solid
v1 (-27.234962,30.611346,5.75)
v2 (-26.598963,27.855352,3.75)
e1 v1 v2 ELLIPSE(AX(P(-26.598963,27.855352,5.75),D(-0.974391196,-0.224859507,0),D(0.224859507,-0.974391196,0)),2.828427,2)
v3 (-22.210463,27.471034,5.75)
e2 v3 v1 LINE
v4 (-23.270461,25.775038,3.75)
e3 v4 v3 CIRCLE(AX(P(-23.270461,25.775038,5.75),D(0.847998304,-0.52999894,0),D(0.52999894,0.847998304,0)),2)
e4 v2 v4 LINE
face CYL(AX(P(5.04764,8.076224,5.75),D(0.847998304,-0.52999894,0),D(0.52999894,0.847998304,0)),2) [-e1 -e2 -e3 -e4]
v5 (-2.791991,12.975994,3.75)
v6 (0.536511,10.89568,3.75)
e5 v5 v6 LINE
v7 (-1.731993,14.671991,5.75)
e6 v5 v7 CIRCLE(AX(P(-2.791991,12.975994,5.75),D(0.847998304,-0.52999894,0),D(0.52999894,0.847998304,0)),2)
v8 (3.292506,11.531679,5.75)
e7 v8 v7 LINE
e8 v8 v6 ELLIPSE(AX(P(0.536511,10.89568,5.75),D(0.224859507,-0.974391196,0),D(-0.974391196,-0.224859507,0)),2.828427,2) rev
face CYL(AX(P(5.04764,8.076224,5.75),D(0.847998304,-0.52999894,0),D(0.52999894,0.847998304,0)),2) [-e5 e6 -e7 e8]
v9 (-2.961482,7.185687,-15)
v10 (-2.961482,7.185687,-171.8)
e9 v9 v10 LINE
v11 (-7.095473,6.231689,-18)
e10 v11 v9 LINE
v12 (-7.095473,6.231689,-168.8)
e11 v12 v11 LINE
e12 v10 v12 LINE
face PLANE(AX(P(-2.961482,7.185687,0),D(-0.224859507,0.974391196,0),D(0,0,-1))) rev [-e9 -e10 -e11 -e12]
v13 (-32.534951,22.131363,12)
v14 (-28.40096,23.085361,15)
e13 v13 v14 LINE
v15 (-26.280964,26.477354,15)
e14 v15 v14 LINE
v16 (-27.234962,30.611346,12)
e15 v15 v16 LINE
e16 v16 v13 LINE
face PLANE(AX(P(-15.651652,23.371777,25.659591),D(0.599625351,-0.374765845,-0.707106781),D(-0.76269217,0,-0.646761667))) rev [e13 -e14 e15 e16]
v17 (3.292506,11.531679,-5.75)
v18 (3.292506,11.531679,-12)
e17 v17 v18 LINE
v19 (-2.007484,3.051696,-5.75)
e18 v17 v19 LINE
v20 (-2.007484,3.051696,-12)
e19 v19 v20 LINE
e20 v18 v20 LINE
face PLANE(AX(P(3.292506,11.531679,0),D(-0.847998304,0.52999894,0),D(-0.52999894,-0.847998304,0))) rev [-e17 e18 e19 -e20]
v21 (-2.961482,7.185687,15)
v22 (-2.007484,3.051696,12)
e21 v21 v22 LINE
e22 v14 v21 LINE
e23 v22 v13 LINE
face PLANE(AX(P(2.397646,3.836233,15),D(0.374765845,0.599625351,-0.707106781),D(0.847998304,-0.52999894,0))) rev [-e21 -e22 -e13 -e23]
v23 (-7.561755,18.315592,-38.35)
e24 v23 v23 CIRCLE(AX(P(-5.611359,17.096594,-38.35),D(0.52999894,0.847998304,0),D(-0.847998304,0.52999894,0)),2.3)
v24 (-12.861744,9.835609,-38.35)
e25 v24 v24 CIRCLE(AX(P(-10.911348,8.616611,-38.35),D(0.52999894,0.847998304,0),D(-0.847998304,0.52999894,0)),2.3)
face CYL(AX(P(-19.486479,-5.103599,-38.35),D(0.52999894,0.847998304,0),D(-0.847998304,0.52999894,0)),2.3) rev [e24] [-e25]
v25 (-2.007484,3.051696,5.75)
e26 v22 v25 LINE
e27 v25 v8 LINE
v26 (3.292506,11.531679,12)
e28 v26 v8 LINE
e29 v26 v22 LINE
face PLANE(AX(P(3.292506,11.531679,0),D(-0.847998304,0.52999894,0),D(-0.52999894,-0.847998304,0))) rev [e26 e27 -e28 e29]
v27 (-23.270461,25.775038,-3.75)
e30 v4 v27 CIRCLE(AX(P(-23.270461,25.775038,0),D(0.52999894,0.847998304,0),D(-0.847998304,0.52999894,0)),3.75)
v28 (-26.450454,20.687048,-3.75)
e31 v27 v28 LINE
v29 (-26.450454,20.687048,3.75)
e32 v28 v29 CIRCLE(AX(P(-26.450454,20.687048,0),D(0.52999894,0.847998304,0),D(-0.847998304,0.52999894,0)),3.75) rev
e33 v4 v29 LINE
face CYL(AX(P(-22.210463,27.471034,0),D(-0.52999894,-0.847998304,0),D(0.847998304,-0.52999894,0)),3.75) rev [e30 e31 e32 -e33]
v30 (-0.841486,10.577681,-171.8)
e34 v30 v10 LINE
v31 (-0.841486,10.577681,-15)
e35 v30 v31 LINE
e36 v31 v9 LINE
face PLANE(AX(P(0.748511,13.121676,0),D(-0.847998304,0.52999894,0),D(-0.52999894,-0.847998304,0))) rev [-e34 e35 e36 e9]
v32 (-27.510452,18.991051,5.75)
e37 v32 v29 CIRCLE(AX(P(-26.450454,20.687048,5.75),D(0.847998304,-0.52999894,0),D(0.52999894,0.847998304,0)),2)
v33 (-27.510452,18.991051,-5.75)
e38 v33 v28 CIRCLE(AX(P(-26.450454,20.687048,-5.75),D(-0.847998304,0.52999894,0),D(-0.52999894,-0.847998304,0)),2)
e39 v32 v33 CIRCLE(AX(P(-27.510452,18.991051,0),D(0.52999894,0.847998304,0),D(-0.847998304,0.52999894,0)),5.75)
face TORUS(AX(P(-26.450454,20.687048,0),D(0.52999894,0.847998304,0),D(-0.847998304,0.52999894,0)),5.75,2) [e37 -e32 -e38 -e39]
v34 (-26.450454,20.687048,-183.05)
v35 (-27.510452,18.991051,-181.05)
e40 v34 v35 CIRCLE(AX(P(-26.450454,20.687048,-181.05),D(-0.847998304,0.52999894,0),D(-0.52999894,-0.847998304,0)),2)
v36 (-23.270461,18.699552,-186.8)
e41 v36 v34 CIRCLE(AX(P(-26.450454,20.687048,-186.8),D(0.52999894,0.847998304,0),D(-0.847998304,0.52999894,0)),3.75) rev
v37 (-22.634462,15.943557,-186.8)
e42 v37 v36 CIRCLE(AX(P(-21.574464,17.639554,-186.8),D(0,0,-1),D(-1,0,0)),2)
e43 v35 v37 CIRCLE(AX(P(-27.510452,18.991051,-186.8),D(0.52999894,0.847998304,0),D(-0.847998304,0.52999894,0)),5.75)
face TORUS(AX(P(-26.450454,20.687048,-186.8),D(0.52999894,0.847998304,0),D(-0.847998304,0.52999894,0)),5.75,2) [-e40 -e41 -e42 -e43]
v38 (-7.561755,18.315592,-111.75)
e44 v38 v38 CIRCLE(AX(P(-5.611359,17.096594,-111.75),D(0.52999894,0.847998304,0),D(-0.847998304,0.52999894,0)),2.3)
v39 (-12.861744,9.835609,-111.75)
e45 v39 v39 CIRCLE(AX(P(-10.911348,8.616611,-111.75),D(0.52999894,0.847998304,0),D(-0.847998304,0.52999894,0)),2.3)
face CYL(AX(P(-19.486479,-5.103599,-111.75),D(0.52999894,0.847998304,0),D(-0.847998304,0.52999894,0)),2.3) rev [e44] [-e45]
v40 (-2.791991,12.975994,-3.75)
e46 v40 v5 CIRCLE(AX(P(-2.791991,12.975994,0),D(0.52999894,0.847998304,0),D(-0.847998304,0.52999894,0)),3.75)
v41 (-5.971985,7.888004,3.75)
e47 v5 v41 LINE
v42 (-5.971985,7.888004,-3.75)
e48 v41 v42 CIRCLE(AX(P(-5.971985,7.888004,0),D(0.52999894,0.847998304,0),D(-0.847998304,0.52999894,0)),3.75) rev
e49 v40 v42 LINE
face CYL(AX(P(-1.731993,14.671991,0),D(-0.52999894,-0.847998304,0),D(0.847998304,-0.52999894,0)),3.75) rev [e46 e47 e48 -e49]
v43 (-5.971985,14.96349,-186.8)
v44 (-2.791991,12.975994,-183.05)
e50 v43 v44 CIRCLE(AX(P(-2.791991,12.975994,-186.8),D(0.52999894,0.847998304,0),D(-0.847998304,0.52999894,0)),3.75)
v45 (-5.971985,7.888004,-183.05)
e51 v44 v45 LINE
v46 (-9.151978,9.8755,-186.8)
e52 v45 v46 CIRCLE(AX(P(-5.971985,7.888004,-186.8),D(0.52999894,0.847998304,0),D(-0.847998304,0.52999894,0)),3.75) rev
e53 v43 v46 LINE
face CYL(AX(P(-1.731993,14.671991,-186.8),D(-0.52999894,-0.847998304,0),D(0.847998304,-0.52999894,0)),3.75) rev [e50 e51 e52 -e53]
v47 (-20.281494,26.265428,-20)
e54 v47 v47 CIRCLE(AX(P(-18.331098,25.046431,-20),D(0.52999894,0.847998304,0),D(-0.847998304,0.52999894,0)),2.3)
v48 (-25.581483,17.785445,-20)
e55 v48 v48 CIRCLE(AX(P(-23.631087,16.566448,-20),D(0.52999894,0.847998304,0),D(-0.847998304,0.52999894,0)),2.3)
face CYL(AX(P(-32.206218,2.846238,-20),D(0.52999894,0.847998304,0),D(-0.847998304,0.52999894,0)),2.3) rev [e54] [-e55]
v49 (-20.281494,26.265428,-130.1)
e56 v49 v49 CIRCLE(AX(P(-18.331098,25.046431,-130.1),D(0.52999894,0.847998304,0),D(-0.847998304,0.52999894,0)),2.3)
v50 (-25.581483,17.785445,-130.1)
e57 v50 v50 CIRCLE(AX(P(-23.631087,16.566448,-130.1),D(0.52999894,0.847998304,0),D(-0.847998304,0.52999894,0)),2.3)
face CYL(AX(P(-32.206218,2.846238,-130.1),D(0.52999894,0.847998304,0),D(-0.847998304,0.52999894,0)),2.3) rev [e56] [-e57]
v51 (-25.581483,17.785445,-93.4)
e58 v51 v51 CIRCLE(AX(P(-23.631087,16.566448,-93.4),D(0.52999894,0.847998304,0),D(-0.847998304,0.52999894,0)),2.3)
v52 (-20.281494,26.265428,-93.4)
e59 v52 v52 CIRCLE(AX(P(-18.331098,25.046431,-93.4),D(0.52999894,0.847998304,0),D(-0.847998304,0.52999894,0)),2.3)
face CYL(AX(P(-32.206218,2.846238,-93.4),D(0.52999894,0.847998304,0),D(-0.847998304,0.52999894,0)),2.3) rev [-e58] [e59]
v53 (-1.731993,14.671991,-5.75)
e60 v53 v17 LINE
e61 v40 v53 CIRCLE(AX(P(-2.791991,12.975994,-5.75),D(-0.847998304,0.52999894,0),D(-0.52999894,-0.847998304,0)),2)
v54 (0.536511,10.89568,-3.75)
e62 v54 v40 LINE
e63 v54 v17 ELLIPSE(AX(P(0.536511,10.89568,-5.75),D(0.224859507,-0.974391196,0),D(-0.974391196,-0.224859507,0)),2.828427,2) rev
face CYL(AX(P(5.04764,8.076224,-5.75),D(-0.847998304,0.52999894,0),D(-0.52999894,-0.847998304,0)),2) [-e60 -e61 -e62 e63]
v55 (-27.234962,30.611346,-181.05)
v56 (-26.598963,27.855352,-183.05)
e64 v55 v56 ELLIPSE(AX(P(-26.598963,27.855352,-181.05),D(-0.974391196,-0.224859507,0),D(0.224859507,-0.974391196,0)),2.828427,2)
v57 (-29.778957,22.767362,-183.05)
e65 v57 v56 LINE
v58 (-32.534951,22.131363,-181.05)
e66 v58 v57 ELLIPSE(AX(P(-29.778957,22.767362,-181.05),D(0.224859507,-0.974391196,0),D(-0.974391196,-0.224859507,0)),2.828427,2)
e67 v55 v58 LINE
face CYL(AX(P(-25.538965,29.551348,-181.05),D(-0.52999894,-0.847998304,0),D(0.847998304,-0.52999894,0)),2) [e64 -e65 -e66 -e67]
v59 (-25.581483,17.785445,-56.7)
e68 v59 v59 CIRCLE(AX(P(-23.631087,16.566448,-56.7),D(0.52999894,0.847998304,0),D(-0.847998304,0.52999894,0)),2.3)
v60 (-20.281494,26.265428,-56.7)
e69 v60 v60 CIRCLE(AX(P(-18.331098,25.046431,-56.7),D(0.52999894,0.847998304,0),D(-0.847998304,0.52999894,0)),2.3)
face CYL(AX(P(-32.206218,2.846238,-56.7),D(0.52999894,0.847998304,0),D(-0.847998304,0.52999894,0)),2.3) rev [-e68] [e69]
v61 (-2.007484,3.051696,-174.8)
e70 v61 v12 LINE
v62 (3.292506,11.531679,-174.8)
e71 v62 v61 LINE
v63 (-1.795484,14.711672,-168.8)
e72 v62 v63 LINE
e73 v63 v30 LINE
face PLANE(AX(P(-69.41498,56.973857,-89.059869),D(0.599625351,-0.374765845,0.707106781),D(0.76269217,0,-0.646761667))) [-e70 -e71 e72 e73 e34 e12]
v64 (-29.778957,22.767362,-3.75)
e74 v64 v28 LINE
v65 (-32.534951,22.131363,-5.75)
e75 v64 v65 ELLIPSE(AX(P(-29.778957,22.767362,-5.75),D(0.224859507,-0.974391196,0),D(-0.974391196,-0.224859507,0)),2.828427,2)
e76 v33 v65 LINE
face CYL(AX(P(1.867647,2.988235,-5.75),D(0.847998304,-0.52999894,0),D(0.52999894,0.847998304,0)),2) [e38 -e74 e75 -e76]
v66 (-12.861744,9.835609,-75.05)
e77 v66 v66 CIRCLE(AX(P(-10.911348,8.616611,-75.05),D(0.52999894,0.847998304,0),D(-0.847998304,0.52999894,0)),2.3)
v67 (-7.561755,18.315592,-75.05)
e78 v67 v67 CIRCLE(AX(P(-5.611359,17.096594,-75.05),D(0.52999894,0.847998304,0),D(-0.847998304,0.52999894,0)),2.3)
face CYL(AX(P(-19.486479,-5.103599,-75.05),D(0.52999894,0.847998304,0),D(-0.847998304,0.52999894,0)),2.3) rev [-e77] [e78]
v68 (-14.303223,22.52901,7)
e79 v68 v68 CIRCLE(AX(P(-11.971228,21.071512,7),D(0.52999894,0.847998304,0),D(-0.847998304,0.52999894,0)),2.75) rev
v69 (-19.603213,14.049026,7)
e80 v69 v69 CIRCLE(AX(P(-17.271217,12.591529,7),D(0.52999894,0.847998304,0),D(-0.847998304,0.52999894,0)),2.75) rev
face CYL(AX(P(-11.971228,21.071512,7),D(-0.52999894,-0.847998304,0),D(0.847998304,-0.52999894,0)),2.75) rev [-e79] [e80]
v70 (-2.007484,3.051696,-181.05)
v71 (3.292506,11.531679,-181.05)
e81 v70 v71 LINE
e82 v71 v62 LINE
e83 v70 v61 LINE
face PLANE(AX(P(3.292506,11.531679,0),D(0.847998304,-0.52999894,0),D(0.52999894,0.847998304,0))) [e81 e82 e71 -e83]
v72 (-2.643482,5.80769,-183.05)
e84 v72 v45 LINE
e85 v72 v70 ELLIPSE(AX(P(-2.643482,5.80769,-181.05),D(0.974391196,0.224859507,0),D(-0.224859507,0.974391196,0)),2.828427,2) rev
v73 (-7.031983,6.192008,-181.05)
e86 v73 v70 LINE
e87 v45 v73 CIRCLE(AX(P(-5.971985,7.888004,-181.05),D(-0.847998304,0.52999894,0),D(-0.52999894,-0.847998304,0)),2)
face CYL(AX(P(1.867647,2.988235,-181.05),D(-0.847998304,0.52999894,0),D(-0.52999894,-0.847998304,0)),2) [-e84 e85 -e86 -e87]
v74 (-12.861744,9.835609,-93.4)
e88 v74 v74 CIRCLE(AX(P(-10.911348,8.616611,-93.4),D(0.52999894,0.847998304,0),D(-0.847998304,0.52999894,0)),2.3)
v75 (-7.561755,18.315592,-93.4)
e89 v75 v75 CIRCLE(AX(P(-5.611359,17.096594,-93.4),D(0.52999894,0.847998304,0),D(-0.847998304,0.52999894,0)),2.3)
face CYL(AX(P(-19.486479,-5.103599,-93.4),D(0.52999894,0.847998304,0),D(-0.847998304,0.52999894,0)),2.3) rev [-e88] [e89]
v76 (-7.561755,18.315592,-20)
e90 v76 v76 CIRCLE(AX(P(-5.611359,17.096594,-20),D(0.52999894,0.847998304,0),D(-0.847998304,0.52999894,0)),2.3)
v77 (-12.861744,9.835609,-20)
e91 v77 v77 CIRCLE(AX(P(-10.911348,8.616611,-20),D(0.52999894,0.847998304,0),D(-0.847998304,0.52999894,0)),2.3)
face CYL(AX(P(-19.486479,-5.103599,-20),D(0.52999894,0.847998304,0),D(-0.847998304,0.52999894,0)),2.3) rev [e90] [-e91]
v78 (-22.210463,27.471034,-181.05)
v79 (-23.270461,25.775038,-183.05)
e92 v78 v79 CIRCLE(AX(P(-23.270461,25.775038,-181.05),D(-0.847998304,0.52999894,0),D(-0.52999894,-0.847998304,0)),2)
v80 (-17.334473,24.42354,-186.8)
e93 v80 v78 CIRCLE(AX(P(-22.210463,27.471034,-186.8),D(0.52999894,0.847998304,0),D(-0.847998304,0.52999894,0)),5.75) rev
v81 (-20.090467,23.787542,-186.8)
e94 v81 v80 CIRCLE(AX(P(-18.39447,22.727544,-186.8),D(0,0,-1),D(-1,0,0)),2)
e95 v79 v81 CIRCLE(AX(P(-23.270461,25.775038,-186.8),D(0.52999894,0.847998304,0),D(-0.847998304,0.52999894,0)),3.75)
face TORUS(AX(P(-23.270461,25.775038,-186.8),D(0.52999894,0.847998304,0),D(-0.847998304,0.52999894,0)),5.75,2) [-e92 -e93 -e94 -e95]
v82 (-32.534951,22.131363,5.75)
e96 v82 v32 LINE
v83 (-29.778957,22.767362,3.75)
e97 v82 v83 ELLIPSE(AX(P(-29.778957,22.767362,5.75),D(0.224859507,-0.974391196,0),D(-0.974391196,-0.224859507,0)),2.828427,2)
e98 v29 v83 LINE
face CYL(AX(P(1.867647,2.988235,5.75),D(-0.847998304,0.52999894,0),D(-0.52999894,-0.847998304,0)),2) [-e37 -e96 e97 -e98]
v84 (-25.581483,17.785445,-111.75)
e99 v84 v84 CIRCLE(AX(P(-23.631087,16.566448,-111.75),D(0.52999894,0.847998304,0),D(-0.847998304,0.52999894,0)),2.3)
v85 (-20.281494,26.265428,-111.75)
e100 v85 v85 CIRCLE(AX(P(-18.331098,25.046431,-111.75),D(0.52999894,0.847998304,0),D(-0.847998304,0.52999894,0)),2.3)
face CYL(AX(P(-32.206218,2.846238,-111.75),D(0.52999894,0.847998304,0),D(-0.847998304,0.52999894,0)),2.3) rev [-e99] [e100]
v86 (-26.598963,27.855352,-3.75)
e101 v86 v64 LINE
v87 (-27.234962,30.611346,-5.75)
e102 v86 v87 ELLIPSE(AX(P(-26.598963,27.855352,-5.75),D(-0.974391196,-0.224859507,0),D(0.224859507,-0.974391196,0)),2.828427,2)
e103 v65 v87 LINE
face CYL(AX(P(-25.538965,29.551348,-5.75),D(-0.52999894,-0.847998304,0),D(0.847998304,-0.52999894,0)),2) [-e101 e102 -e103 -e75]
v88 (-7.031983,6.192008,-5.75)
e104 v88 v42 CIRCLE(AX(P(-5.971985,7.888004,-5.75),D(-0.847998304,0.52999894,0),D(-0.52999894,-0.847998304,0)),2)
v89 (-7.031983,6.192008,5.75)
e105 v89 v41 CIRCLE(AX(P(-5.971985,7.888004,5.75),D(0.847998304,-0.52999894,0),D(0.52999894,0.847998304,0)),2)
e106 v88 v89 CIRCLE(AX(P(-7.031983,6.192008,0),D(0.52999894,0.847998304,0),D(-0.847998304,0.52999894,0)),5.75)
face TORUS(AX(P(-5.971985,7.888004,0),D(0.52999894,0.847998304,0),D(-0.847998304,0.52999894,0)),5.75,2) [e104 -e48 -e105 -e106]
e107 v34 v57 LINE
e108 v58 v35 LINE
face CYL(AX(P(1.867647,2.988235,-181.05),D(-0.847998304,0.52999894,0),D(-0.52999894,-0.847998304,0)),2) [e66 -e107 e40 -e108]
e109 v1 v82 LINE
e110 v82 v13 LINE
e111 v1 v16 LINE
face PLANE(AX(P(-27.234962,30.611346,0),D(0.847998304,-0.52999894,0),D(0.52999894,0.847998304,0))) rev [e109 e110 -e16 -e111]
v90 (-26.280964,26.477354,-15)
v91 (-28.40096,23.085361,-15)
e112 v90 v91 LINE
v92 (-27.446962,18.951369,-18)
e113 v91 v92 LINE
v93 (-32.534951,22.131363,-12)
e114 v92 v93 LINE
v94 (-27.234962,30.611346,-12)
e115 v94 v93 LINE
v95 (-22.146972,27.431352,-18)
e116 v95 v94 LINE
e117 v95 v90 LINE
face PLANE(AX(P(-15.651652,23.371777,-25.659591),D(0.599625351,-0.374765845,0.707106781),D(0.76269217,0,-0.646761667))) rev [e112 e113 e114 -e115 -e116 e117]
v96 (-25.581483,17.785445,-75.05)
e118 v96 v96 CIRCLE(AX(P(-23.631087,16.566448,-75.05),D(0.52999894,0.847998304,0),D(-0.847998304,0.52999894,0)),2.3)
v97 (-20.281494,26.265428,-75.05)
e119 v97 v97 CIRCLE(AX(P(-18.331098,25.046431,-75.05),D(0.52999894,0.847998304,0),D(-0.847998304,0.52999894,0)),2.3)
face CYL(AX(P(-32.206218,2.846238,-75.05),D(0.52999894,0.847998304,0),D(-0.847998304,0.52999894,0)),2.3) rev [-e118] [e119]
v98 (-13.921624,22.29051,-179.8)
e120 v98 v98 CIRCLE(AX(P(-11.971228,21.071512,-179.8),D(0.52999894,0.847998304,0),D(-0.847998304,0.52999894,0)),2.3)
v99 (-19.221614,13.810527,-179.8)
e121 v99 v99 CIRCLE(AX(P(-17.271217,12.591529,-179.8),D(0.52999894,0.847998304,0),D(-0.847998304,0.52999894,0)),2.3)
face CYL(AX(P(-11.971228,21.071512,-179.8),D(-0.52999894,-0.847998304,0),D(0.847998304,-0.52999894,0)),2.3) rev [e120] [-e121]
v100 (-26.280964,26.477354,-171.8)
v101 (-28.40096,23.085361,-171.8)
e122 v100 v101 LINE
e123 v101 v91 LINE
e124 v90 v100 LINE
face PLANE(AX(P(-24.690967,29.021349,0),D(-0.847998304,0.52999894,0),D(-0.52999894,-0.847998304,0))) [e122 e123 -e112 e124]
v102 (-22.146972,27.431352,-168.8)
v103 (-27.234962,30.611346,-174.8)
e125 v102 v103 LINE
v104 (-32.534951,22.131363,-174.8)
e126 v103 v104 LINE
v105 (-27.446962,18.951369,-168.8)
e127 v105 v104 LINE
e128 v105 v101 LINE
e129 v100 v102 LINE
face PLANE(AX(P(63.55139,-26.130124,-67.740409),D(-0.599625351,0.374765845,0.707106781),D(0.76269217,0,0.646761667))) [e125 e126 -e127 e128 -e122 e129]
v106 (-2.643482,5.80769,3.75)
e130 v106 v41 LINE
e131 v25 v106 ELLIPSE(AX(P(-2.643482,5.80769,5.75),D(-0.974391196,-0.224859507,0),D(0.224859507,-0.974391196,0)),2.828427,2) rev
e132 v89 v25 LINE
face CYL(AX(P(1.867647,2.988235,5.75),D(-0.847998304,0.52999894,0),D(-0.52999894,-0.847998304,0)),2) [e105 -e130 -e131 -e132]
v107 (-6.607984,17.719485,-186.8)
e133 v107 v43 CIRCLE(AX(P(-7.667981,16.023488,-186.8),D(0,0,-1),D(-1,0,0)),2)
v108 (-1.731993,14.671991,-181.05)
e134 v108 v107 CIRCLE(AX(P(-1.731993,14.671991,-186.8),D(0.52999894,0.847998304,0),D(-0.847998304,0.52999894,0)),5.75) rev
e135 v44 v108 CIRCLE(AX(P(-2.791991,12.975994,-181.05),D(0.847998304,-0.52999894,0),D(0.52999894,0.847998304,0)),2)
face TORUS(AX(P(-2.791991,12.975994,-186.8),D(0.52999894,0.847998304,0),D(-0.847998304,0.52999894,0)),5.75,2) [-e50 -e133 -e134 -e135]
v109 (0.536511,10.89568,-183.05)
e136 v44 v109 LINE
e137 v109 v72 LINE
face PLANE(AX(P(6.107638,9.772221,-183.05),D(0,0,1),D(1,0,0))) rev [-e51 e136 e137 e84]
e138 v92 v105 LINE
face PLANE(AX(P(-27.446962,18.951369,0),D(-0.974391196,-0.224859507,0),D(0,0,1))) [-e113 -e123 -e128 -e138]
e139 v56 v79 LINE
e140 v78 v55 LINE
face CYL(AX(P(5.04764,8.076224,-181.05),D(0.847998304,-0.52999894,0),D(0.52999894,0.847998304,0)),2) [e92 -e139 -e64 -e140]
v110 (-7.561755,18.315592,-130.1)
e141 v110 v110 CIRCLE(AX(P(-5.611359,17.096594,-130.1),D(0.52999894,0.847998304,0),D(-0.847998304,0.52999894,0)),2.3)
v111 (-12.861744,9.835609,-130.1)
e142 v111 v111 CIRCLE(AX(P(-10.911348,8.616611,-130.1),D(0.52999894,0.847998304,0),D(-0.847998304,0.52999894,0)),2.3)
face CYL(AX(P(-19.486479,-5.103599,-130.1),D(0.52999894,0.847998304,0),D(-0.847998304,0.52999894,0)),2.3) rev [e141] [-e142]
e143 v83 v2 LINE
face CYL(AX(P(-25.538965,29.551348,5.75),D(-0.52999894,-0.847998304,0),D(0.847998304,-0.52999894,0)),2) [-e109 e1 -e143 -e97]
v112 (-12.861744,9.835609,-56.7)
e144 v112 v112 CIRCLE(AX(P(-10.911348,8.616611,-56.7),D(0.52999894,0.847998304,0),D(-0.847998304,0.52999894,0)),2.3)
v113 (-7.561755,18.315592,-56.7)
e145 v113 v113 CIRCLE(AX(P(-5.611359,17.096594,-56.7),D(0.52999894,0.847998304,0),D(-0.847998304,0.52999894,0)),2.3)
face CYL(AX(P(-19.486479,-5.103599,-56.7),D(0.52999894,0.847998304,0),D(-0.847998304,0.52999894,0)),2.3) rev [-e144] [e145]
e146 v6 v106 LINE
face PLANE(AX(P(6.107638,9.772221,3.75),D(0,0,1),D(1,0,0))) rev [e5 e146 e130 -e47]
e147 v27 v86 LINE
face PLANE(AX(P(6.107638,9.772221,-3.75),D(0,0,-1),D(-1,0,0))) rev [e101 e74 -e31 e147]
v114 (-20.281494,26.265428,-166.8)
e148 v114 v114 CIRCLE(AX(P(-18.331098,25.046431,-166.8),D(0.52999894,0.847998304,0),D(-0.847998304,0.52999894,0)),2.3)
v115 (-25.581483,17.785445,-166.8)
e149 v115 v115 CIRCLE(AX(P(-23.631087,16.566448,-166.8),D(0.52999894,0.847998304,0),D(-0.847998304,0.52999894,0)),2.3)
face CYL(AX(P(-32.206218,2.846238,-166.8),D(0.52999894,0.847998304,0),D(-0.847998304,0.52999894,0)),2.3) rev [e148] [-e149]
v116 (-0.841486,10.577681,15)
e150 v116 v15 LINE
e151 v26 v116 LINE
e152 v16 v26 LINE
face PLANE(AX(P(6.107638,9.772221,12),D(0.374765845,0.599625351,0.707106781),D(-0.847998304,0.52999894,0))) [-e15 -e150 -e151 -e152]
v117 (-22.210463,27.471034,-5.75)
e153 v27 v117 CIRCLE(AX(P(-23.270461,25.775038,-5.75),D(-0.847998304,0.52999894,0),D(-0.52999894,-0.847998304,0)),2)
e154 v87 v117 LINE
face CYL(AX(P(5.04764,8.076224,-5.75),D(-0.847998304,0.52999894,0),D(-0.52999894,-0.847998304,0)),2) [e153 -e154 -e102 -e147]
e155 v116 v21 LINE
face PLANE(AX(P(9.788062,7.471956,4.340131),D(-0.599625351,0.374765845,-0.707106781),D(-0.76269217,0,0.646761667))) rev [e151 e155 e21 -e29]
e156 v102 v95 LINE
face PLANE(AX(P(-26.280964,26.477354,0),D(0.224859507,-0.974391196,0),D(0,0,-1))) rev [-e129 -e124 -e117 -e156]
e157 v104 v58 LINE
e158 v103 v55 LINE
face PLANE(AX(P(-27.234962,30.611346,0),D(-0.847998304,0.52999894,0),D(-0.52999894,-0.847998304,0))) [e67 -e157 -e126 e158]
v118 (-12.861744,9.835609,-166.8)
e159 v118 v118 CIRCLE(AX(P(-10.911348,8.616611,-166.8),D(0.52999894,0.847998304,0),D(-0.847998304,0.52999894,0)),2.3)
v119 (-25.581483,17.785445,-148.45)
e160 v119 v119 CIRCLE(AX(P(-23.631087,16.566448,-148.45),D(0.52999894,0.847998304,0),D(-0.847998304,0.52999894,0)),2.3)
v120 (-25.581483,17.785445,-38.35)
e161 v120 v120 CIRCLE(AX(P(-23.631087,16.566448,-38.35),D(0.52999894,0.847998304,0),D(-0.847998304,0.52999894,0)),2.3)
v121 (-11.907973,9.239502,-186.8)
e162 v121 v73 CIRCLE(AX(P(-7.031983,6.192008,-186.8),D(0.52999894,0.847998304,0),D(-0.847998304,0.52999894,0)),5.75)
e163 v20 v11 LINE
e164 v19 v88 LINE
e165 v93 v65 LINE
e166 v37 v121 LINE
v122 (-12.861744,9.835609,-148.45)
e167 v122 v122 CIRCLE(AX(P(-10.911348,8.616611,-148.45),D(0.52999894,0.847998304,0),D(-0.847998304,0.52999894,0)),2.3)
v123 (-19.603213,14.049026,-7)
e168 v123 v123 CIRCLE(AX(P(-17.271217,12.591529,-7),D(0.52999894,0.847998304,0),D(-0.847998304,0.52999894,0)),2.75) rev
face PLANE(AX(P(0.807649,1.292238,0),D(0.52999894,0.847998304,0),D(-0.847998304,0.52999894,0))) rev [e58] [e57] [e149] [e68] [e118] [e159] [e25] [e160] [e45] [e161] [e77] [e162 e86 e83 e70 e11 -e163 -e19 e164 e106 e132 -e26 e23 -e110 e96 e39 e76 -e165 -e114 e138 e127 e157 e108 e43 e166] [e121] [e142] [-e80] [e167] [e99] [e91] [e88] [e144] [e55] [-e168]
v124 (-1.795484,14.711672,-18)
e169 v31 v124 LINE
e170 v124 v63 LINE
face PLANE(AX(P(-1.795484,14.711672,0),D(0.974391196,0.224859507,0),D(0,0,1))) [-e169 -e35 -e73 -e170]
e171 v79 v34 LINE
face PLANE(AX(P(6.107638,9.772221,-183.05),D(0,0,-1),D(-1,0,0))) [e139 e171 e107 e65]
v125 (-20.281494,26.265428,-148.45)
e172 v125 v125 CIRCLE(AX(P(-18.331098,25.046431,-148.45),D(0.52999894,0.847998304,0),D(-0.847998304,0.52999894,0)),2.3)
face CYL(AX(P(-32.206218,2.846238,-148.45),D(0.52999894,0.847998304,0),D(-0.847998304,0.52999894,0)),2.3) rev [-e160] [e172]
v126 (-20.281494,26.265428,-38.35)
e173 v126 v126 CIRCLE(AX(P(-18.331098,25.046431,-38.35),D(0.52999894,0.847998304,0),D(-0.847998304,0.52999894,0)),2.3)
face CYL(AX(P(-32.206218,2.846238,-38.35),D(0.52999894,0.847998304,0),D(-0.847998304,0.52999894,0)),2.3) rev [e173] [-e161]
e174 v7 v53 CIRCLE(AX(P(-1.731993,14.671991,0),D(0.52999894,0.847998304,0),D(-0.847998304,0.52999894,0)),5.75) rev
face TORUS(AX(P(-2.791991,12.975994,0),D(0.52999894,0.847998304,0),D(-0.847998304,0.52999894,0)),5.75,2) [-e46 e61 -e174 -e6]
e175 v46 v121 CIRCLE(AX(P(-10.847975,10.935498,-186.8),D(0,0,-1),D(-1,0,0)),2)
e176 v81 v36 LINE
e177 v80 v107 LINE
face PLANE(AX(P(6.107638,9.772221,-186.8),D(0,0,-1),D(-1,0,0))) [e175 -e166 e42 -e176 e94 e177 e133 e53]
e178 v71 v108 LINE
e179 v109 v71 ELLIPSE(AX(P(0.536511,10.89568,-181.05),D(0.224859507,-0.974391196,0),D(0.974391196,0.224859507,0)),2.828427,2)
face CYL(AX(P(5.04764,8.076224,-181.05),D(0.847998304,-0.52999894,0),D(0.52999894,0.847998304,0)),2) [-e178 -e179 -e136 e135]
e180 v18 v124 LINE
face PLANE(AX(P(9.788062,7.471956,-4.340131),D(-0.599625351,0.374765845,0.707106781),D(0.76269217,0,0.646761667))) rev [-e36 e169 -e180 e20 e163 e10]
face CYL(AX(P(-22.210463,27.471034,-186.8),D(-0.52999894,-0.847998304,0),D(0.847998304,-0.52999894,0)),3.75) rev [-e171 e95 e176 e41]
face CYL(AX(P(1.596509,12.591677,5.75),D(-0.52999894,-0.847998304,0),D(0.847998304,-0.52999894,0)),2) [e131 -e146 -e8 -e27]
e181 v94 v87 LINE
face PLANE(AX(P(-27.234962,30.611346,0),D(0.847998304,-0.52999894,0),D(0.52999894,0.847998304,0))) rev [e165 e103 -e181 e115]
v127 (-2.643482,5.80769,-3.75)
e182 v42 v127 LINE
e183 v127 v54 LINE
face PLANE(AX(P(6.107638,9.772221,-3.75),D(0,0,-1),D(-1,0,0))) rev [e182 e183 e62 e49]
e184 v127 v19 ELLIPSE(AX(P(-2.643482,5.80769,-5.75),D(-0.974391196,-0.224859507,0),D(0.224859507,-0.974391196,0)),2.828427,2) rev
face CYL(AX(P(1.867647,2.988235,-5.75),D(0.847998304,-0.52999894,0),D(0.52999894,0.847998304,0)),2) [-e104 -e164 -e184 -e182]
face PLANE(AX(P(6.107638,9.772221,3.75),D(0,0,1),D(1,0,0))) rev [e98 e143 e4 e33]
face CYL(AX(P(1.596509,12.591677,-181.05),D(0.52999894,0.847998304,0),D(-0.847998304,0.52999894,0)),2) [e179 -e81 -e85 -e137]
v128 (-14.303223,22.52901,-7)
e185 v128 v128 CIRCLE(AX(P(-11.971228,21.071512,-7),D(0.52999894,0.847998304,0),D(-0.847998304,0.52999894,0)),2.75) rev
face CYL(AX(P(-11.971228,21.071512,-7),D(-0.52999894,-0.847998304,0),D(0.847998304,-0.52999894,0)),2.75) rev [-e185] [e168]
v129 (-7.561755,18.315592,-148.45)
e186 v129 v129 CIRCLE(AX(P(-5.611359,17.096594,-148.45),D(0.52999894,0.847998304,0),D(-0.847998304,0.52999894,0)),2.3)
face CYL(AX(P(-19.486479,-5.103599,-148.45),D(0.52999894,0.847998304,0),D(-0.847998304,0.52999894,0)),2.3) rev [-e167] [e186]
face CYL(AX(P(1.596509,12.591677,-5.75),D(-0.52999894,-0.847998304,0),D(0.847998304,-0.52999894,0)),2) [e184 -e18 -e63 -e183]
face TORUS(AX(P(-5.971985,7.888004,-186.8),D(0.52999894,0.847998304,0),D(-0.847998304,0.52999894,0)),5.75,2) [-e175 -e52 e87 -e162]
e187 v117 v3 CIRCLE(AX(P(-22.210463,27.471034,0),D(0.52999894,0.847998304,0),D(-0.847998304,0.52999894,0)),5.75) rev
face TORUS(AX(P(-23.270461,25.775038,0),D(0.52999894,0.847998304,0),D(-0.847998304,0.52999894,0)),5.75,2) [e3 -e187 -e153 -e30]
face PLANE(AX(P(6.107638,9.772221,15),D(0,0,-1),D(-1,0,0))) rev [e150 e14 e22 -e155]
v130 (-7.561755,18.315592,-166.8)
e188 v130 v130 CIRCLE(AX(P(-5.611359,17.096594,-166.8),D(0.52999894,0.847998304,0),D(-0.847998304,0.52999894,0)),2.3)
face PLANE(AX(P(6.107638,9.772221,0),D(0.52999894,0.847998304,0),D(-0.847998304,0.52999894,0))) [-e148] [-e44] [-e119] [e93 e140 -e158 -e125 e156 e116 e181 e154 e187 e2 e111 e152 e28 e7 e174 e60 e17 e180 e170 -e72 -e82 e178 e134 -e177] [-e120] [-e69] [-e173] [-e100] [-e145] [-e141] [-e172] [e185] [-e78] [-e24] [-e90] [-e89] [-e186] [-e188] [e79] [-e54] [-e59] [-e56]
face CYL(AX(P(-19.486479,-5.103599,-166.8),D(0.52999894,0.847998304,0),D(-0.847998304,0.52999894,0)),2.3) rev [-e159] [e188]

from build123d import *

# Parameters (mm, degrees)
BOSS_EXTRU_1_OUTLINE_R   = 2.75
BOSS_EXTRU_1_OUTLINE_R_2 = 2.3
BOSS_EXTRU_1_DEPTH       = 10
ESQUISSE2_R              = 2.3
ENL_V_MAT_EXTRU_1_DEPTH  = 192.889965503
CONG_1_R                 = 2
CHANFREIN1_SIZE          = 3


# Read off the part's stored shape, not the designer's step: Boss.-Extru.1
with BuildPart() as part:
    # Boss.-Extru.1 outline → Boss.-Extru.1 (new body)
    with BuildSketch(Plane(origin=(0.807648755, 1.292238009, 0), x_dir=(0.8479983040028684, -0.5299989400067315, 0), z_dir=(0.5299989400067315, 0.8479983040028684, 0))):
        with BuildLine():
            Line((-3.319738136, 183.05), (-9.244866887, 183.05))
            ThreePointArc((-9.244866887, 183.05), (-11.896517316, 184.148349571), (-12.994866887, 186.8))
            Line((-12.994866887, 186.8), (-29.644053825, 186.8))
            ThreePointArc((-29.644053825, 186.8), (-30.742403396, 184.148349571), (-33.394053825, 183.05))
            Line((-33.394053825, 183.05), (-39.319182576, 183.05))
            Line((-39.319182576, 183.05), (-39.319182576, 174.8))
            Line((-39.319182576, 174.8), (-36.319182576, 171.8))
            Line((-36.319182576, 171.8), (-36.319182576, 15))
            Line((-36.319182576, 15), (-39.319182576, 12))
            Line((-39.319182576, 12), (-39.319182576, 3.75))
            Line((-39.319182576, 3.75), (-33.394053825, 3.75))
            ThreePointArc((-33.394053825, 3.75), (-29.644053825, 0), (-33.394053825, -3.75))
            Line((-33.394053825, -3.75), (-39.319182576, -3.75))
            Line((-39.319182576, -3.75), (-39.319182576, -12))
            Line((-39.319182576, -12), (-36.319182576, -15))
            Line((-36.319182576, -15), (-6.319738136, -15))
            Line((-6.319738136, -15), (-3.319738136, -12))
            Line((-3.319738136, -12), (-3.319738136, -3.75))
            Line((-3.319738136, -3.75), (-9.244866887, -3.75))
            ThreePointArc((-9.244866887, -3.75), (-12.994866887, 0), (-9.244866887, 3.75))
            Line((-9.244866887, 3.75), (-3.319738136, 3.75))
            Line((-3.319738136, 3.75), (-3.319738136, 12))
            Line((-3.319738136, 12), (-6.319738136, 15))
            Line((-6.319738136, 15), (-6.319738136, 171.8))
            Line((-6.319738136, 171.8), (-3.319738136, 174.8))
            Line((-3.319738136, 174.8), (-3.319738136, 183.05))
        make_face()
        with Locations((-21.319460356, -7)):
            Circle(BOSS_EXTRU_1_OUTLINE_R, mode=Mode.SUBTRACT)
        with Locations((-21.319460356, 7)):
            Circle(BOSS_EXTRU_1_OUTLINE_R, mode=Mode.SUBTRACT)
        with Locations((-21.319460356, 179.8)):
            Circle(BOSS_EXTRU_1_OUTLINE_R_2, mode=Mode.SUBTRACT)
    extrude(amount=BOSS_EXTRU_1_DEPTH)

    # Esquisse2 → Enlèv. mat.-Extru.1 (cut, through all)
    with BuildSketch(Plane(origin=(6.107638155, 9.772221049, 0), x_dir=(0.8479983040028684, -0.5299989400067316, 0), z_dir=(0.5299989400067316, 0.8479983040028684, 0))):
        with Locations(Location((-28.819321466, 148.45, 0), (0, 0, 180))):
            Circle(ESQUISSE2_R)
        with Locations(Location((-13.819599246, 148.45, 0), (0, 0, 180))):
            Circle(ESQUISSE2_R)
        with Locations(Location((-28.819321466, 130.1, 0), (0, 0, 180))):
            Circle(ESQUISSE2_R)
        with Locations(Location((-13.819599246, 130.1, 0), (0, 0, 180))):
            Circle(ESQUISSE2_R)
        with Locations(Location((-28.819321466, 111.75, 0), (0, 0, 180))):
            Circle(ESQUISSE2_R)
        with Locations(Location((-13.819599246, 111.75, 0), (0, 0, 180))):
            Circle(ESQUISSE2_R)
        with Locations(Location((-28.819321466, 93.4, 0), (0, 0, 180))):
            Circle(ESQUISSE2_R)
        with Locations(Location((-13.819599246, 93.4, 0), (0, 0, 180))):
            Circle(ESQUISSE2_R)
        with Locations(Location((-28.819321466, 75.05, 0), (0, 0, 180))):
            Circle(ESQUISSE2_R)
        with Locations(Location((-13.819599246, 75.05, 0), (0, 0, 180))):
            Circle(ESQUISSE2_R)
        with Locations(Location((-13.819599246, 56.7, 0), (0, 0, 180))):
            Circle(ESQUISSE2_R)
        with Locations(Location((-13.819599246, 38.35, 0), (0, 0, 180))):
            Circle(ESQUISSE2_R)
        with Locations(Location((-13.819599246, 20, 0), (0, 0, 180))):
            Circle(ESQUISSE2_R)
        with Locations(Location((-28.819321466, 38.35, 0), (0, 0, 180))):
            Circle(ESQUISSE2_R)
        with Locations(Location((-28.819321466, 20, 0), (0, 0, 180))):
            Circle(ESQUISSE2_R)
        with Locations(Location((-28.819321466, 56.7, 0), (0, 0, 180))):
            Circle(ESQUISSE2_R)
        with Locations(Location((-28.819321466, 166.8, 0), (0, 0, 180))):
            Circle(ESQUISSE2_R)
        with Locations(Location((-13.819599246, 166.8, 0), (0, 0, 180))):
            Circle(ESQUISSE2_R)
    extrude(amount=-ENL_V_MAT_EXTRU_1_DEPTH, mode=Mode.SUBTRACT)

    # Congé1
    cong_1_edges = [part.edges().sort_by_distance(p)[0] for p in [
        (0.78025628, 13.10183472, 3.75),
        (-4.911986926, 16.659486724, 0),
        (0.78025628, 13.10183472, -3.75),
        (-3.980588352, 16.077362616, -184.148349571),
        (0.78025628, 13.10183472, -183.05),
        (-19.961867785, 26.065662262, -184.148349571),
        (-24.722712418, 29.041190157, -183.05),
        (-4.51973312, 4.62185168, -183.05),
        (-4.51973312, 4.62185168, -3.75),
        (-10.211976326, 8.179503684, 0),
        (-4.51973312, 4.62185168, 3.75),
        (-30.022701818, 20.561207117, 3.75),
        (-24.330458612, 17.003555113, 0),
        (-30.022701818, 20.561207117, -3.75),
        (-30.022701818, 20.561207117, -183.05),
        (-25.261857185, 17.585679222, -184.148349571),
        (-9.280577752, 7.597379576, -184.148349571),
        (0.642511146, 7.291687222, -183.05),
        (0.642511146, 7.291687222, -3.75),
        (0.642511146, 7.291687222, 3.75),
        (-29.884956684, 26.371354616, 3.75),
        (-29.884956684, 26.371354616, -3.75),
        (-29.884956684, 26.371354616, -183.05),
        (-24.722712418, 29.041190157, -3.75),
        (-19.030469212, 25.483538153, 0),
        (-24.722712418, 29.041190157, 3.75),
    ]]
    fillet(cong_1_edges, radius=CONG_1_R)

    # Chanfrein1
    chanfrein1_edges = [part.edges().sort_by_distance(p)[0] for p in [
        (0.748510934, 13.121675562, -93.4),
        (-4.551478466, 4.641692522, -93.4),
        (-17.271217469, 12.591529399, 15),
        (-29.990956472, 20.541366276, -93.4),
        (-24.690967072, 29.021349316, -93.4),
        (-11.971228069, 21.071512439, 15),
    ]]
    chamfer(chanfrein1_edges, length=CHANFREIN1_SIZE)


solid = part.part
